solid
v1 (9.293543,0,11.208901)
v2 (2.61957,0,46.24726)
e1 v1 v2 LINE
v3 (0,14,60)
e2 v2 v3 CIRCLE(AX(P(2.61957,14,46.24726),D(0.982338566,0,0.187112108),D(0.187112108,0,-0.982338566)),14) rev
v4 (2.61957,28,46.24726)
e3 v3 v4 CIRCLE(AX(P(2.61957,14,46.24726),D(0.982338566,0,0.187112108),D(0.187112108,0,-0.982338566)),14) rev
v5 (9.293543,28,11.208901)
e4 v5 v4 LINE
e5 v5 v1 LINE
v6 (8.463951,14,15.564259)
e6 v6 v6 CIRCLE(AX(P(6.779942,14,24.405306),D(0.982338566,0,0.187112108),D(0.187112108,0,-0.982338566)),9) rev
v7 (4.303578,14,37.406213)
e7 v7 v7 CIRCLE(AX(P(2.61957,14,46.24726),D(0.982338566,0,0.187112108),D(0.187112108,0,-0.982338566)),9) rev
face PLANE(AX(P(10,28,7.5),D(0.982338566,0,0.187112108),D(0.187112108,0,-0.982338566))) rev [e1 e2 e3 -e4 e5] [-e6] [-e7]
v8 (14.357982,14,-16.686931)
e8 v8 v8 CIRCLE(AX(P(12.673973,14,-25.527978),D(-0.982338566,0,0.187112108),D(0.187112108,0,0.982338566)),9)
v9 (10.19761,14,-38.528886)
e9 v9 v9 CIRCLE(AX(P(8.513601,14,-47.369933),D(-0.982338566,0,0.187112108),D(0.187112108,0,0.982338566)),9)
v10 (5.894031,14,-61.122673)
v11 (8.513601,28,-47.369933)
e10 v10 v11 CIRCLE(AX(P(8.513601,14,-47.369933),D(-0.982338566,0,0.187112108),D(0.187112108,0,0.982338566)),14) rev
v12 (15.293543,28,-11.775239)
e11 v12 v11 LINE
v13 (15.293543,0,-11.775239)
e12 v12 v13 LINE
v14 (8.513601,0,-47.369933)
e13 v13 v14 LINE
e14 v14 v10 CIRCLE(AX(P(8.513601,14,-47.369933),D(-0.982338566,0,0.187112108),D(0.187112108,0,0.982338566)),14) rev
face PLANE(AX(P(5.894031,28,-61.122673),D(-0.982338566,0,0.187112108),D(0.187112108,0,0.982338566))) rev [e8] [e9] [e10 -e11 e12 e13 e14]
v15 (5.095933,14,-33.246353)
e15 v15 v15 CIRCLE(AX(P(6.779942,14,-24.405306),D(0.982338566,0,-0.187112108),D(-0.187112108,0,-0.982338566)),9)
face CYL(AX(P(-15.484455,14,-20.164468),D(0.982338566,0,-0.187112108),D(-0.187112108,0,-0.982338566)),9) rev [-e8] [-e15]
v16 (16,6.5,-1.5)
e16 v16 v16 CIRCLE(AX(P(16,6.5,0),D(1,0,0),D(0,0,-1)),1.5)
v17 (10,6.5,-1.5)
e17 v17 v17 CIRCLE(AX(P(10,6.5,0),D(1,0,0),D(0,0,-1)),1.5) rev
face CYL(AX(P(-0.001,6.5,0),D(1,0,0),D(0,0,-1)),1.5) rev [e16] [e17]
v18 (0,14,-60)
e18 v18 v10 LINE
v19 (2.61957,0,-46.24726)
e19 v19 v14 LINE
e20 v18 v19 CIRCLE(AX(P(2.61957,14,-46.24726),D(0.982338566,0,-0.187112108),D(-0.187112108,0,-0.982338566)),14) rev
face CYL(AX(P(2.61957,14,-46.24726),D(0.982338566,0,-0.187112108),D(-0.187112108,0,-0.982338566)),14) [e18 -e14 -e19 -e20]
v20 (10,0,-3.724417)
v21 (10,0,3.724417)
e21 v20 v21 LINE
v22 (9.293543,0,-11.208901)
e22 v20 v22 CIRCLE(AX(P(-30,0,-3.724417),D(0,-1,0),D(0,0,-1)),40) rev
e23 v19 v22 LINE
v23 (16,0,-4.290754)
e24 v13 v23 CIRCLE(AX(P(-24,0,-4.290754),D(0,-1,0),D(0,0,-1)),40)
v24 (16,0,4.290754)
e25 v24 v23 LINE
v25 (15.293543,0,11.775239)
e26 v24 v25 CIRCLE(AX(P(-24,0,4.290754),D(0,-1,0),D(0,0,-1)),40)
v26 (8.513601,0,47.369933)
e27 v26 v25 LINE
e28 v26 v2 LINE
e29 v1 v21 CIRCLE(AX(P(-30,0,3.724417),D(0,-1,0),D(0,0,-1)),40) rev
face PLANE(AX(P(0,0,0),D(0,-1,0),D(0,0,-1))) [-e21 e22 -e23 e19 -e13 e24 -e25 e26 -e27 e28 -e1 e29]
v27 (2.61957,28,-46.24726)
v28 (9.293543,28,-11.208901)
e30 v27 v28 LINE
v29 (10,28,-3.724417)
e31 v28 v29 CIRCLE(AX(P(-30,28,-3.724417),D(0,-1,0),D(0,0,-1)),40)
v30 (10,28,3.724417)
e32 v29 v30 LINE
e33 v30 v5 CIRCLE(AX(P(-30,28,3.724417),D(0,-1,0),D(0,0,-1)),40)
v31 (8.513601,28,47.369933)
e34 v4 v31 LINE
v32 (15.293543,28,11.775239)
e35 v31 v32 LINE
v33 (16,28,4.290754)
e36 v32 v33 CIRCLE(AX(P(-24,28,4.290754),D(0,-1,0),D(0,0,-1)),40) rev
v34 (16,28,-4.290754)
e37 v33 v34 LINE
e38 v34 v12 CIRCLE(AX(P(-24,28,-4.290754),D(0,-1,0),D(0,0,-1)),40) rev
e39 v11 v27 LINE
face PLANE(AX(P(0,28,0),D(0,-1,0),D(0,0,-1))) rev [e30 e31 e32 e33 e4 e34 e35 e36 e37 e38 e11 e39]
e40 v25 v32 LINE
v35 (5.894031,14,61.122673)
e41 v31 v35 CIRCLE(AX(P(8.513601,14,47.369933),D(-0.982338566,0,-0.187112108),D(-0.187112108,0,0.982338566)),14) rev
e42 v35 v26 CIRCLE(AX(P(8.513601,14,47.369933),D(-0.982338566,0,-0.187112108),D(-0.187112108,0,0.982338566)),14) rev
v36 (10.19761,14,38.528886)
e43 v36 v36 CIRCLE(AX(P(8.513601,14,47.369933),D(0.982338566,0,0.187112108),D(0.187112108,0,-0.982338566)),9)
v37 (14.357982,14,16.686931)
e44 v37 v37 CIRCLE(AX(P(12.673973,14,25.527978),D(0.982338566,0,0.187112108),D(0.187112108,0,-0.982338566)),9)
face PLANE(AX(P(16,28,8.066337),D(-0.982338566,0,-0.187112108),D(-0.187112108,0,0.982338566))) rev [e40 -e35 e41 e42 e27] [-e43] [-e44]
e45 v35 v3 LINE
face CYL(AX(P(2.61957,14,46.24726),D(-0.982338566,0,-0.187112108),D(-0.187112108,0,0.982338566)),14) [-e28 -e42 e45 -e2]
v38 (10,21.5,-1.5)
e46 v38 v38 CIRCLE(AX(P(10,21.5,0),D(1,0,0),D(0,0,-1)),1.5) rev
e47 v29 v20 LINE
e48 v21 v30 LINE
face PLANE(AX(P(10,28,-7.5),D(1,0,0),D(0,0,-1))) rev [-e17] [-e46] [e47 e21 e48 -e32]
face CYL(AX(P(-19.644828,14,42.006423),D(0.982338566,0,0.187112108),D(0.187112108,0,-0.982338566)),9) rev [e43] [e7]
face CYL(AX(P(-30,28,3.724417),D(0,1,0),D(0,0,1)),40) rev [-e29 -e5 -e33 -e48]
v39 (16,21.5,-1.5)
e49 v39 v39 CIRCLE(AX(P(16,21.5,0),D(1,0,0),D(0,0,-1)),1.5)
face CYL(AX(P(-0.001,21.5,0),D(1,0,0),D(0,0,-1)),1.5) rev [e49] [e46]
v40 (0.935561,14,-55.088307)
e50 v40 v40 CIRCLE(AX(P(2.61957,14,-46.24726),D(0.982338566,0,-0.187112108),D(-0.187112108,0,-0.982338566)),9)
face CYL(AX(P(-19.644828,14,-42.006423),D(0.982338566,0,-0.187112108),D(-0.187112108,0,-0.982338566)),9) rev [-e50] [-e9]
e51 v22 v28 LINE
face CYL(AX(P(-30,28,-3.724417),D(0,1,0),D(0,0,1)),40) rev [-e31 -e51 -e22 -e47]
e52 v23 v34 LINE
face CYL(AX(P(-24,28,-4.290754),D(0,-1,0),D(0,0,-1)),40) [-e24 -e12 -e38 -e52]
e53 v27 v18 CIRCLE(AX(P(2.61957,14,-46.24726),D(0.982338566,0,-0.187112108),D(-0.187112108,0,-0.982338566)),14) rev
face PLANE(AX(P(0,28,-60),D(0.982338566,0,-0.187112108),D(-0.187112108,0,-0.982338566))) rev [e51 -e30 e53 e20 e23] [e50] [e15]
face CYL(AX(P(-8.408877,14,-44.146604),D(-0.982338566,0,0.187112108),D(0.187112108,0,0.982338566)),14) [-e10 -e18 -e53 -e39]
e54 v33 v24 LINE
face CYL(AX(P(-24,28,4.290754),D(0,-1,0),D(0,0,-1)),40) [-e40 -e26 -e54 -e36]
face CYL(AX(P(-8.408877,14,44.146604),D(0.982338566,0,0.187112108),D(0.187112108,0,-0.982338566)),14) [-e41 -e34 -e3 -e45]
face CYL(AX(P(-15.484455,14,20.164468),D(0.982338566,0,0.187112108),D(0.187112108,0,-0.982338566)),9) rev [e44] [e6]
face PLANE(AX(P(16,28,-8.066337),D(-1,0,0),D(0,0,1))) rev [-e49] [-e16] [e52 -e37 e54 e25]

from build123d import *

# Parameters (mm, degrees)
BOSS_EXTRUDE1_DEPTH = 28
FILLET1_R           = 40
CUT_EXTRUDE1_REACH  = 74.186
SKETCH2_R           = 9
CUT_EXTRUDE2_REACH  = 71.108
SKETCH3_R           = 1.5
FILLET2_R           = 14


with BuildPart() as part:
    # Sketch1 → Boss-Extrude1 (new body)
    with BuildSketch(Plane(origin=(0, 0, 0), x_dir=(1, 0, 0), z_dir=(0, 1, 0))):
        Polygon((0, 60), (10, 7.5), (10, -7.5), (0, -60), (5.894031399, -61.122672647), (16, -8.06633749), (16, 8.06633749), (5.894031399, 61.122672647), align=None)
    extrude(amount=BOSS_EXTRUDE1_DEPTH)

    # Fillet1
    fillet1_edges = [part.edges().sort_by_distance(p)[0] for p in [
        (10, 14, 7.5),
        (10, 14, -7.5),
        (16, 14, -8.06633749),
        (16, 14, 8.06633749),
    ]]
    fillet(fillet1_edges, radius=FILLET1_R)

    # Sketch2 → Cut-Extrude1 (cut, up to next)
    with BuildSketch(Plane(origin=(16.922477788, 0, 3.223329102), x_dir=(0.1871121078899954, 0, -0.9823385664224749), z_dir=(0.9823385664224749, 0, 0.1871121078899954)), mode=Mode.PRIVATE) as cut_extrude1_sk1:
        with Locations((-44.940313985, 14)):
            Circle(SKETCH2_R)
    cut_extrude1_tool1 = extrude(cut_extrude1_sk1.sketch, amount=-CUT_EXTRUDE1_REACH, mode=Mode.PRIVATE) & part.part
    # Sketch2 → Cut-Extrude1 (cut, up to next)
    with BuildSketch(Plane(origin=(16.922477788, 0, 3.223329102), x_dir=(0.1871121078899954, 0, -0.9823385664224749), z_dir=(0.9823385664224749, 0, 0.1871121078899954)), mode=Mode.PRIVATE) as cut_extrude1_sk2:
        with Locations((-22.705663944, 14)):
            Circle(SKETCH2_R)
    cut_extrude1_tool2 = extrude(cut_extrude1_sk2.sketch, amount=-CUT_EXTRUDE1_REACH, mode=Mode.PRIVATE) & part.part
    cut_extrude1_1 = cut_extrude1_tool1.solids().sort_by_distance((8.513601, 14, 47.369933))[0]
    add(cut_extrude1_1, mode=Mode.SUBTRACT)
    cut_extrude1_2 = cut_extrude1_tool2.solids().sort_by_distance((12.673973, 14, 25.527978))[0]
    add(cut_extrude1_2, mode=Mode.SUBTRACT)
    cut_extrude1 = cut_extrude1_1 + cut_extrude1_2  # Cut-Extrude1 as one shape, for the pattern or mirror that repeats it

    # Mirror1: Cut-Extrude1 across plane
    add(cut_extrude1.mirror(Plane.XY), mode=Mode.SUBTRACT)

    # Sketch3 → Cut-Extrude2 (cut, up to next)
    with BuildSketch(Plane(origin=(16, 0, 0), x_dir=(0, 0, -1), z_dir=(1, 0, 0)), mode=Mode.PRIVATE) as cut_extrude2_sk1:
        with Locations((0, 21.5)):
            Circle(SKETCH3_R)
    cut_extrude2_tool1 = extrude(cut_extrude2_sk1.sketch, amount=-CUT_EXTRUDE2_REACH, mode=Mode.PRIVATE) & part.part
    # Sketch3 → Cut-Extrude2 (cut, up to next)
    with BuildSketch(Plane(origin=(16, 0, 0), x_dir=(0, 0, -1), z_dir=(1, 0, 0)), mode=Mode.PRIVATE) as cut_extrude2_sk2:
        with Locations((0, 6.5)):
            Circle(SKETCH3_R)
    cut_extrude2_tool2 = extrude(cut_extrude2_sk2.sketch, amount=-CUT_EXTRUDE2_REACH, mode=Mode.PRIVATE) & part.part
    add(cut_extrude2_tool1.solids().sort_by_distance((16, 21.5, 0))[0], mode=Mode.SUBTRACT)
    add(cut_extrude2_tool2.solids().sort_by_distance((16, 6.5, 0))[0], mode=Mode.SUBTRACT)

    # Fillet2
    fillet2_edges = [part.edges().sort_by_distance(p)[0] for p in [
        (2.947015699, 0, -60.561336324),
        (2.947015699, 28, -60.561336324),
        (2.947015699, 0, 60.561336324),
        (2.947015699, 28, 60.561336324),
    ]]
    fillet(fillet2_edges, radius=FILLET2_R - 0.0001)  # a hair under: the kernel refuses the full size


solid = part.part
